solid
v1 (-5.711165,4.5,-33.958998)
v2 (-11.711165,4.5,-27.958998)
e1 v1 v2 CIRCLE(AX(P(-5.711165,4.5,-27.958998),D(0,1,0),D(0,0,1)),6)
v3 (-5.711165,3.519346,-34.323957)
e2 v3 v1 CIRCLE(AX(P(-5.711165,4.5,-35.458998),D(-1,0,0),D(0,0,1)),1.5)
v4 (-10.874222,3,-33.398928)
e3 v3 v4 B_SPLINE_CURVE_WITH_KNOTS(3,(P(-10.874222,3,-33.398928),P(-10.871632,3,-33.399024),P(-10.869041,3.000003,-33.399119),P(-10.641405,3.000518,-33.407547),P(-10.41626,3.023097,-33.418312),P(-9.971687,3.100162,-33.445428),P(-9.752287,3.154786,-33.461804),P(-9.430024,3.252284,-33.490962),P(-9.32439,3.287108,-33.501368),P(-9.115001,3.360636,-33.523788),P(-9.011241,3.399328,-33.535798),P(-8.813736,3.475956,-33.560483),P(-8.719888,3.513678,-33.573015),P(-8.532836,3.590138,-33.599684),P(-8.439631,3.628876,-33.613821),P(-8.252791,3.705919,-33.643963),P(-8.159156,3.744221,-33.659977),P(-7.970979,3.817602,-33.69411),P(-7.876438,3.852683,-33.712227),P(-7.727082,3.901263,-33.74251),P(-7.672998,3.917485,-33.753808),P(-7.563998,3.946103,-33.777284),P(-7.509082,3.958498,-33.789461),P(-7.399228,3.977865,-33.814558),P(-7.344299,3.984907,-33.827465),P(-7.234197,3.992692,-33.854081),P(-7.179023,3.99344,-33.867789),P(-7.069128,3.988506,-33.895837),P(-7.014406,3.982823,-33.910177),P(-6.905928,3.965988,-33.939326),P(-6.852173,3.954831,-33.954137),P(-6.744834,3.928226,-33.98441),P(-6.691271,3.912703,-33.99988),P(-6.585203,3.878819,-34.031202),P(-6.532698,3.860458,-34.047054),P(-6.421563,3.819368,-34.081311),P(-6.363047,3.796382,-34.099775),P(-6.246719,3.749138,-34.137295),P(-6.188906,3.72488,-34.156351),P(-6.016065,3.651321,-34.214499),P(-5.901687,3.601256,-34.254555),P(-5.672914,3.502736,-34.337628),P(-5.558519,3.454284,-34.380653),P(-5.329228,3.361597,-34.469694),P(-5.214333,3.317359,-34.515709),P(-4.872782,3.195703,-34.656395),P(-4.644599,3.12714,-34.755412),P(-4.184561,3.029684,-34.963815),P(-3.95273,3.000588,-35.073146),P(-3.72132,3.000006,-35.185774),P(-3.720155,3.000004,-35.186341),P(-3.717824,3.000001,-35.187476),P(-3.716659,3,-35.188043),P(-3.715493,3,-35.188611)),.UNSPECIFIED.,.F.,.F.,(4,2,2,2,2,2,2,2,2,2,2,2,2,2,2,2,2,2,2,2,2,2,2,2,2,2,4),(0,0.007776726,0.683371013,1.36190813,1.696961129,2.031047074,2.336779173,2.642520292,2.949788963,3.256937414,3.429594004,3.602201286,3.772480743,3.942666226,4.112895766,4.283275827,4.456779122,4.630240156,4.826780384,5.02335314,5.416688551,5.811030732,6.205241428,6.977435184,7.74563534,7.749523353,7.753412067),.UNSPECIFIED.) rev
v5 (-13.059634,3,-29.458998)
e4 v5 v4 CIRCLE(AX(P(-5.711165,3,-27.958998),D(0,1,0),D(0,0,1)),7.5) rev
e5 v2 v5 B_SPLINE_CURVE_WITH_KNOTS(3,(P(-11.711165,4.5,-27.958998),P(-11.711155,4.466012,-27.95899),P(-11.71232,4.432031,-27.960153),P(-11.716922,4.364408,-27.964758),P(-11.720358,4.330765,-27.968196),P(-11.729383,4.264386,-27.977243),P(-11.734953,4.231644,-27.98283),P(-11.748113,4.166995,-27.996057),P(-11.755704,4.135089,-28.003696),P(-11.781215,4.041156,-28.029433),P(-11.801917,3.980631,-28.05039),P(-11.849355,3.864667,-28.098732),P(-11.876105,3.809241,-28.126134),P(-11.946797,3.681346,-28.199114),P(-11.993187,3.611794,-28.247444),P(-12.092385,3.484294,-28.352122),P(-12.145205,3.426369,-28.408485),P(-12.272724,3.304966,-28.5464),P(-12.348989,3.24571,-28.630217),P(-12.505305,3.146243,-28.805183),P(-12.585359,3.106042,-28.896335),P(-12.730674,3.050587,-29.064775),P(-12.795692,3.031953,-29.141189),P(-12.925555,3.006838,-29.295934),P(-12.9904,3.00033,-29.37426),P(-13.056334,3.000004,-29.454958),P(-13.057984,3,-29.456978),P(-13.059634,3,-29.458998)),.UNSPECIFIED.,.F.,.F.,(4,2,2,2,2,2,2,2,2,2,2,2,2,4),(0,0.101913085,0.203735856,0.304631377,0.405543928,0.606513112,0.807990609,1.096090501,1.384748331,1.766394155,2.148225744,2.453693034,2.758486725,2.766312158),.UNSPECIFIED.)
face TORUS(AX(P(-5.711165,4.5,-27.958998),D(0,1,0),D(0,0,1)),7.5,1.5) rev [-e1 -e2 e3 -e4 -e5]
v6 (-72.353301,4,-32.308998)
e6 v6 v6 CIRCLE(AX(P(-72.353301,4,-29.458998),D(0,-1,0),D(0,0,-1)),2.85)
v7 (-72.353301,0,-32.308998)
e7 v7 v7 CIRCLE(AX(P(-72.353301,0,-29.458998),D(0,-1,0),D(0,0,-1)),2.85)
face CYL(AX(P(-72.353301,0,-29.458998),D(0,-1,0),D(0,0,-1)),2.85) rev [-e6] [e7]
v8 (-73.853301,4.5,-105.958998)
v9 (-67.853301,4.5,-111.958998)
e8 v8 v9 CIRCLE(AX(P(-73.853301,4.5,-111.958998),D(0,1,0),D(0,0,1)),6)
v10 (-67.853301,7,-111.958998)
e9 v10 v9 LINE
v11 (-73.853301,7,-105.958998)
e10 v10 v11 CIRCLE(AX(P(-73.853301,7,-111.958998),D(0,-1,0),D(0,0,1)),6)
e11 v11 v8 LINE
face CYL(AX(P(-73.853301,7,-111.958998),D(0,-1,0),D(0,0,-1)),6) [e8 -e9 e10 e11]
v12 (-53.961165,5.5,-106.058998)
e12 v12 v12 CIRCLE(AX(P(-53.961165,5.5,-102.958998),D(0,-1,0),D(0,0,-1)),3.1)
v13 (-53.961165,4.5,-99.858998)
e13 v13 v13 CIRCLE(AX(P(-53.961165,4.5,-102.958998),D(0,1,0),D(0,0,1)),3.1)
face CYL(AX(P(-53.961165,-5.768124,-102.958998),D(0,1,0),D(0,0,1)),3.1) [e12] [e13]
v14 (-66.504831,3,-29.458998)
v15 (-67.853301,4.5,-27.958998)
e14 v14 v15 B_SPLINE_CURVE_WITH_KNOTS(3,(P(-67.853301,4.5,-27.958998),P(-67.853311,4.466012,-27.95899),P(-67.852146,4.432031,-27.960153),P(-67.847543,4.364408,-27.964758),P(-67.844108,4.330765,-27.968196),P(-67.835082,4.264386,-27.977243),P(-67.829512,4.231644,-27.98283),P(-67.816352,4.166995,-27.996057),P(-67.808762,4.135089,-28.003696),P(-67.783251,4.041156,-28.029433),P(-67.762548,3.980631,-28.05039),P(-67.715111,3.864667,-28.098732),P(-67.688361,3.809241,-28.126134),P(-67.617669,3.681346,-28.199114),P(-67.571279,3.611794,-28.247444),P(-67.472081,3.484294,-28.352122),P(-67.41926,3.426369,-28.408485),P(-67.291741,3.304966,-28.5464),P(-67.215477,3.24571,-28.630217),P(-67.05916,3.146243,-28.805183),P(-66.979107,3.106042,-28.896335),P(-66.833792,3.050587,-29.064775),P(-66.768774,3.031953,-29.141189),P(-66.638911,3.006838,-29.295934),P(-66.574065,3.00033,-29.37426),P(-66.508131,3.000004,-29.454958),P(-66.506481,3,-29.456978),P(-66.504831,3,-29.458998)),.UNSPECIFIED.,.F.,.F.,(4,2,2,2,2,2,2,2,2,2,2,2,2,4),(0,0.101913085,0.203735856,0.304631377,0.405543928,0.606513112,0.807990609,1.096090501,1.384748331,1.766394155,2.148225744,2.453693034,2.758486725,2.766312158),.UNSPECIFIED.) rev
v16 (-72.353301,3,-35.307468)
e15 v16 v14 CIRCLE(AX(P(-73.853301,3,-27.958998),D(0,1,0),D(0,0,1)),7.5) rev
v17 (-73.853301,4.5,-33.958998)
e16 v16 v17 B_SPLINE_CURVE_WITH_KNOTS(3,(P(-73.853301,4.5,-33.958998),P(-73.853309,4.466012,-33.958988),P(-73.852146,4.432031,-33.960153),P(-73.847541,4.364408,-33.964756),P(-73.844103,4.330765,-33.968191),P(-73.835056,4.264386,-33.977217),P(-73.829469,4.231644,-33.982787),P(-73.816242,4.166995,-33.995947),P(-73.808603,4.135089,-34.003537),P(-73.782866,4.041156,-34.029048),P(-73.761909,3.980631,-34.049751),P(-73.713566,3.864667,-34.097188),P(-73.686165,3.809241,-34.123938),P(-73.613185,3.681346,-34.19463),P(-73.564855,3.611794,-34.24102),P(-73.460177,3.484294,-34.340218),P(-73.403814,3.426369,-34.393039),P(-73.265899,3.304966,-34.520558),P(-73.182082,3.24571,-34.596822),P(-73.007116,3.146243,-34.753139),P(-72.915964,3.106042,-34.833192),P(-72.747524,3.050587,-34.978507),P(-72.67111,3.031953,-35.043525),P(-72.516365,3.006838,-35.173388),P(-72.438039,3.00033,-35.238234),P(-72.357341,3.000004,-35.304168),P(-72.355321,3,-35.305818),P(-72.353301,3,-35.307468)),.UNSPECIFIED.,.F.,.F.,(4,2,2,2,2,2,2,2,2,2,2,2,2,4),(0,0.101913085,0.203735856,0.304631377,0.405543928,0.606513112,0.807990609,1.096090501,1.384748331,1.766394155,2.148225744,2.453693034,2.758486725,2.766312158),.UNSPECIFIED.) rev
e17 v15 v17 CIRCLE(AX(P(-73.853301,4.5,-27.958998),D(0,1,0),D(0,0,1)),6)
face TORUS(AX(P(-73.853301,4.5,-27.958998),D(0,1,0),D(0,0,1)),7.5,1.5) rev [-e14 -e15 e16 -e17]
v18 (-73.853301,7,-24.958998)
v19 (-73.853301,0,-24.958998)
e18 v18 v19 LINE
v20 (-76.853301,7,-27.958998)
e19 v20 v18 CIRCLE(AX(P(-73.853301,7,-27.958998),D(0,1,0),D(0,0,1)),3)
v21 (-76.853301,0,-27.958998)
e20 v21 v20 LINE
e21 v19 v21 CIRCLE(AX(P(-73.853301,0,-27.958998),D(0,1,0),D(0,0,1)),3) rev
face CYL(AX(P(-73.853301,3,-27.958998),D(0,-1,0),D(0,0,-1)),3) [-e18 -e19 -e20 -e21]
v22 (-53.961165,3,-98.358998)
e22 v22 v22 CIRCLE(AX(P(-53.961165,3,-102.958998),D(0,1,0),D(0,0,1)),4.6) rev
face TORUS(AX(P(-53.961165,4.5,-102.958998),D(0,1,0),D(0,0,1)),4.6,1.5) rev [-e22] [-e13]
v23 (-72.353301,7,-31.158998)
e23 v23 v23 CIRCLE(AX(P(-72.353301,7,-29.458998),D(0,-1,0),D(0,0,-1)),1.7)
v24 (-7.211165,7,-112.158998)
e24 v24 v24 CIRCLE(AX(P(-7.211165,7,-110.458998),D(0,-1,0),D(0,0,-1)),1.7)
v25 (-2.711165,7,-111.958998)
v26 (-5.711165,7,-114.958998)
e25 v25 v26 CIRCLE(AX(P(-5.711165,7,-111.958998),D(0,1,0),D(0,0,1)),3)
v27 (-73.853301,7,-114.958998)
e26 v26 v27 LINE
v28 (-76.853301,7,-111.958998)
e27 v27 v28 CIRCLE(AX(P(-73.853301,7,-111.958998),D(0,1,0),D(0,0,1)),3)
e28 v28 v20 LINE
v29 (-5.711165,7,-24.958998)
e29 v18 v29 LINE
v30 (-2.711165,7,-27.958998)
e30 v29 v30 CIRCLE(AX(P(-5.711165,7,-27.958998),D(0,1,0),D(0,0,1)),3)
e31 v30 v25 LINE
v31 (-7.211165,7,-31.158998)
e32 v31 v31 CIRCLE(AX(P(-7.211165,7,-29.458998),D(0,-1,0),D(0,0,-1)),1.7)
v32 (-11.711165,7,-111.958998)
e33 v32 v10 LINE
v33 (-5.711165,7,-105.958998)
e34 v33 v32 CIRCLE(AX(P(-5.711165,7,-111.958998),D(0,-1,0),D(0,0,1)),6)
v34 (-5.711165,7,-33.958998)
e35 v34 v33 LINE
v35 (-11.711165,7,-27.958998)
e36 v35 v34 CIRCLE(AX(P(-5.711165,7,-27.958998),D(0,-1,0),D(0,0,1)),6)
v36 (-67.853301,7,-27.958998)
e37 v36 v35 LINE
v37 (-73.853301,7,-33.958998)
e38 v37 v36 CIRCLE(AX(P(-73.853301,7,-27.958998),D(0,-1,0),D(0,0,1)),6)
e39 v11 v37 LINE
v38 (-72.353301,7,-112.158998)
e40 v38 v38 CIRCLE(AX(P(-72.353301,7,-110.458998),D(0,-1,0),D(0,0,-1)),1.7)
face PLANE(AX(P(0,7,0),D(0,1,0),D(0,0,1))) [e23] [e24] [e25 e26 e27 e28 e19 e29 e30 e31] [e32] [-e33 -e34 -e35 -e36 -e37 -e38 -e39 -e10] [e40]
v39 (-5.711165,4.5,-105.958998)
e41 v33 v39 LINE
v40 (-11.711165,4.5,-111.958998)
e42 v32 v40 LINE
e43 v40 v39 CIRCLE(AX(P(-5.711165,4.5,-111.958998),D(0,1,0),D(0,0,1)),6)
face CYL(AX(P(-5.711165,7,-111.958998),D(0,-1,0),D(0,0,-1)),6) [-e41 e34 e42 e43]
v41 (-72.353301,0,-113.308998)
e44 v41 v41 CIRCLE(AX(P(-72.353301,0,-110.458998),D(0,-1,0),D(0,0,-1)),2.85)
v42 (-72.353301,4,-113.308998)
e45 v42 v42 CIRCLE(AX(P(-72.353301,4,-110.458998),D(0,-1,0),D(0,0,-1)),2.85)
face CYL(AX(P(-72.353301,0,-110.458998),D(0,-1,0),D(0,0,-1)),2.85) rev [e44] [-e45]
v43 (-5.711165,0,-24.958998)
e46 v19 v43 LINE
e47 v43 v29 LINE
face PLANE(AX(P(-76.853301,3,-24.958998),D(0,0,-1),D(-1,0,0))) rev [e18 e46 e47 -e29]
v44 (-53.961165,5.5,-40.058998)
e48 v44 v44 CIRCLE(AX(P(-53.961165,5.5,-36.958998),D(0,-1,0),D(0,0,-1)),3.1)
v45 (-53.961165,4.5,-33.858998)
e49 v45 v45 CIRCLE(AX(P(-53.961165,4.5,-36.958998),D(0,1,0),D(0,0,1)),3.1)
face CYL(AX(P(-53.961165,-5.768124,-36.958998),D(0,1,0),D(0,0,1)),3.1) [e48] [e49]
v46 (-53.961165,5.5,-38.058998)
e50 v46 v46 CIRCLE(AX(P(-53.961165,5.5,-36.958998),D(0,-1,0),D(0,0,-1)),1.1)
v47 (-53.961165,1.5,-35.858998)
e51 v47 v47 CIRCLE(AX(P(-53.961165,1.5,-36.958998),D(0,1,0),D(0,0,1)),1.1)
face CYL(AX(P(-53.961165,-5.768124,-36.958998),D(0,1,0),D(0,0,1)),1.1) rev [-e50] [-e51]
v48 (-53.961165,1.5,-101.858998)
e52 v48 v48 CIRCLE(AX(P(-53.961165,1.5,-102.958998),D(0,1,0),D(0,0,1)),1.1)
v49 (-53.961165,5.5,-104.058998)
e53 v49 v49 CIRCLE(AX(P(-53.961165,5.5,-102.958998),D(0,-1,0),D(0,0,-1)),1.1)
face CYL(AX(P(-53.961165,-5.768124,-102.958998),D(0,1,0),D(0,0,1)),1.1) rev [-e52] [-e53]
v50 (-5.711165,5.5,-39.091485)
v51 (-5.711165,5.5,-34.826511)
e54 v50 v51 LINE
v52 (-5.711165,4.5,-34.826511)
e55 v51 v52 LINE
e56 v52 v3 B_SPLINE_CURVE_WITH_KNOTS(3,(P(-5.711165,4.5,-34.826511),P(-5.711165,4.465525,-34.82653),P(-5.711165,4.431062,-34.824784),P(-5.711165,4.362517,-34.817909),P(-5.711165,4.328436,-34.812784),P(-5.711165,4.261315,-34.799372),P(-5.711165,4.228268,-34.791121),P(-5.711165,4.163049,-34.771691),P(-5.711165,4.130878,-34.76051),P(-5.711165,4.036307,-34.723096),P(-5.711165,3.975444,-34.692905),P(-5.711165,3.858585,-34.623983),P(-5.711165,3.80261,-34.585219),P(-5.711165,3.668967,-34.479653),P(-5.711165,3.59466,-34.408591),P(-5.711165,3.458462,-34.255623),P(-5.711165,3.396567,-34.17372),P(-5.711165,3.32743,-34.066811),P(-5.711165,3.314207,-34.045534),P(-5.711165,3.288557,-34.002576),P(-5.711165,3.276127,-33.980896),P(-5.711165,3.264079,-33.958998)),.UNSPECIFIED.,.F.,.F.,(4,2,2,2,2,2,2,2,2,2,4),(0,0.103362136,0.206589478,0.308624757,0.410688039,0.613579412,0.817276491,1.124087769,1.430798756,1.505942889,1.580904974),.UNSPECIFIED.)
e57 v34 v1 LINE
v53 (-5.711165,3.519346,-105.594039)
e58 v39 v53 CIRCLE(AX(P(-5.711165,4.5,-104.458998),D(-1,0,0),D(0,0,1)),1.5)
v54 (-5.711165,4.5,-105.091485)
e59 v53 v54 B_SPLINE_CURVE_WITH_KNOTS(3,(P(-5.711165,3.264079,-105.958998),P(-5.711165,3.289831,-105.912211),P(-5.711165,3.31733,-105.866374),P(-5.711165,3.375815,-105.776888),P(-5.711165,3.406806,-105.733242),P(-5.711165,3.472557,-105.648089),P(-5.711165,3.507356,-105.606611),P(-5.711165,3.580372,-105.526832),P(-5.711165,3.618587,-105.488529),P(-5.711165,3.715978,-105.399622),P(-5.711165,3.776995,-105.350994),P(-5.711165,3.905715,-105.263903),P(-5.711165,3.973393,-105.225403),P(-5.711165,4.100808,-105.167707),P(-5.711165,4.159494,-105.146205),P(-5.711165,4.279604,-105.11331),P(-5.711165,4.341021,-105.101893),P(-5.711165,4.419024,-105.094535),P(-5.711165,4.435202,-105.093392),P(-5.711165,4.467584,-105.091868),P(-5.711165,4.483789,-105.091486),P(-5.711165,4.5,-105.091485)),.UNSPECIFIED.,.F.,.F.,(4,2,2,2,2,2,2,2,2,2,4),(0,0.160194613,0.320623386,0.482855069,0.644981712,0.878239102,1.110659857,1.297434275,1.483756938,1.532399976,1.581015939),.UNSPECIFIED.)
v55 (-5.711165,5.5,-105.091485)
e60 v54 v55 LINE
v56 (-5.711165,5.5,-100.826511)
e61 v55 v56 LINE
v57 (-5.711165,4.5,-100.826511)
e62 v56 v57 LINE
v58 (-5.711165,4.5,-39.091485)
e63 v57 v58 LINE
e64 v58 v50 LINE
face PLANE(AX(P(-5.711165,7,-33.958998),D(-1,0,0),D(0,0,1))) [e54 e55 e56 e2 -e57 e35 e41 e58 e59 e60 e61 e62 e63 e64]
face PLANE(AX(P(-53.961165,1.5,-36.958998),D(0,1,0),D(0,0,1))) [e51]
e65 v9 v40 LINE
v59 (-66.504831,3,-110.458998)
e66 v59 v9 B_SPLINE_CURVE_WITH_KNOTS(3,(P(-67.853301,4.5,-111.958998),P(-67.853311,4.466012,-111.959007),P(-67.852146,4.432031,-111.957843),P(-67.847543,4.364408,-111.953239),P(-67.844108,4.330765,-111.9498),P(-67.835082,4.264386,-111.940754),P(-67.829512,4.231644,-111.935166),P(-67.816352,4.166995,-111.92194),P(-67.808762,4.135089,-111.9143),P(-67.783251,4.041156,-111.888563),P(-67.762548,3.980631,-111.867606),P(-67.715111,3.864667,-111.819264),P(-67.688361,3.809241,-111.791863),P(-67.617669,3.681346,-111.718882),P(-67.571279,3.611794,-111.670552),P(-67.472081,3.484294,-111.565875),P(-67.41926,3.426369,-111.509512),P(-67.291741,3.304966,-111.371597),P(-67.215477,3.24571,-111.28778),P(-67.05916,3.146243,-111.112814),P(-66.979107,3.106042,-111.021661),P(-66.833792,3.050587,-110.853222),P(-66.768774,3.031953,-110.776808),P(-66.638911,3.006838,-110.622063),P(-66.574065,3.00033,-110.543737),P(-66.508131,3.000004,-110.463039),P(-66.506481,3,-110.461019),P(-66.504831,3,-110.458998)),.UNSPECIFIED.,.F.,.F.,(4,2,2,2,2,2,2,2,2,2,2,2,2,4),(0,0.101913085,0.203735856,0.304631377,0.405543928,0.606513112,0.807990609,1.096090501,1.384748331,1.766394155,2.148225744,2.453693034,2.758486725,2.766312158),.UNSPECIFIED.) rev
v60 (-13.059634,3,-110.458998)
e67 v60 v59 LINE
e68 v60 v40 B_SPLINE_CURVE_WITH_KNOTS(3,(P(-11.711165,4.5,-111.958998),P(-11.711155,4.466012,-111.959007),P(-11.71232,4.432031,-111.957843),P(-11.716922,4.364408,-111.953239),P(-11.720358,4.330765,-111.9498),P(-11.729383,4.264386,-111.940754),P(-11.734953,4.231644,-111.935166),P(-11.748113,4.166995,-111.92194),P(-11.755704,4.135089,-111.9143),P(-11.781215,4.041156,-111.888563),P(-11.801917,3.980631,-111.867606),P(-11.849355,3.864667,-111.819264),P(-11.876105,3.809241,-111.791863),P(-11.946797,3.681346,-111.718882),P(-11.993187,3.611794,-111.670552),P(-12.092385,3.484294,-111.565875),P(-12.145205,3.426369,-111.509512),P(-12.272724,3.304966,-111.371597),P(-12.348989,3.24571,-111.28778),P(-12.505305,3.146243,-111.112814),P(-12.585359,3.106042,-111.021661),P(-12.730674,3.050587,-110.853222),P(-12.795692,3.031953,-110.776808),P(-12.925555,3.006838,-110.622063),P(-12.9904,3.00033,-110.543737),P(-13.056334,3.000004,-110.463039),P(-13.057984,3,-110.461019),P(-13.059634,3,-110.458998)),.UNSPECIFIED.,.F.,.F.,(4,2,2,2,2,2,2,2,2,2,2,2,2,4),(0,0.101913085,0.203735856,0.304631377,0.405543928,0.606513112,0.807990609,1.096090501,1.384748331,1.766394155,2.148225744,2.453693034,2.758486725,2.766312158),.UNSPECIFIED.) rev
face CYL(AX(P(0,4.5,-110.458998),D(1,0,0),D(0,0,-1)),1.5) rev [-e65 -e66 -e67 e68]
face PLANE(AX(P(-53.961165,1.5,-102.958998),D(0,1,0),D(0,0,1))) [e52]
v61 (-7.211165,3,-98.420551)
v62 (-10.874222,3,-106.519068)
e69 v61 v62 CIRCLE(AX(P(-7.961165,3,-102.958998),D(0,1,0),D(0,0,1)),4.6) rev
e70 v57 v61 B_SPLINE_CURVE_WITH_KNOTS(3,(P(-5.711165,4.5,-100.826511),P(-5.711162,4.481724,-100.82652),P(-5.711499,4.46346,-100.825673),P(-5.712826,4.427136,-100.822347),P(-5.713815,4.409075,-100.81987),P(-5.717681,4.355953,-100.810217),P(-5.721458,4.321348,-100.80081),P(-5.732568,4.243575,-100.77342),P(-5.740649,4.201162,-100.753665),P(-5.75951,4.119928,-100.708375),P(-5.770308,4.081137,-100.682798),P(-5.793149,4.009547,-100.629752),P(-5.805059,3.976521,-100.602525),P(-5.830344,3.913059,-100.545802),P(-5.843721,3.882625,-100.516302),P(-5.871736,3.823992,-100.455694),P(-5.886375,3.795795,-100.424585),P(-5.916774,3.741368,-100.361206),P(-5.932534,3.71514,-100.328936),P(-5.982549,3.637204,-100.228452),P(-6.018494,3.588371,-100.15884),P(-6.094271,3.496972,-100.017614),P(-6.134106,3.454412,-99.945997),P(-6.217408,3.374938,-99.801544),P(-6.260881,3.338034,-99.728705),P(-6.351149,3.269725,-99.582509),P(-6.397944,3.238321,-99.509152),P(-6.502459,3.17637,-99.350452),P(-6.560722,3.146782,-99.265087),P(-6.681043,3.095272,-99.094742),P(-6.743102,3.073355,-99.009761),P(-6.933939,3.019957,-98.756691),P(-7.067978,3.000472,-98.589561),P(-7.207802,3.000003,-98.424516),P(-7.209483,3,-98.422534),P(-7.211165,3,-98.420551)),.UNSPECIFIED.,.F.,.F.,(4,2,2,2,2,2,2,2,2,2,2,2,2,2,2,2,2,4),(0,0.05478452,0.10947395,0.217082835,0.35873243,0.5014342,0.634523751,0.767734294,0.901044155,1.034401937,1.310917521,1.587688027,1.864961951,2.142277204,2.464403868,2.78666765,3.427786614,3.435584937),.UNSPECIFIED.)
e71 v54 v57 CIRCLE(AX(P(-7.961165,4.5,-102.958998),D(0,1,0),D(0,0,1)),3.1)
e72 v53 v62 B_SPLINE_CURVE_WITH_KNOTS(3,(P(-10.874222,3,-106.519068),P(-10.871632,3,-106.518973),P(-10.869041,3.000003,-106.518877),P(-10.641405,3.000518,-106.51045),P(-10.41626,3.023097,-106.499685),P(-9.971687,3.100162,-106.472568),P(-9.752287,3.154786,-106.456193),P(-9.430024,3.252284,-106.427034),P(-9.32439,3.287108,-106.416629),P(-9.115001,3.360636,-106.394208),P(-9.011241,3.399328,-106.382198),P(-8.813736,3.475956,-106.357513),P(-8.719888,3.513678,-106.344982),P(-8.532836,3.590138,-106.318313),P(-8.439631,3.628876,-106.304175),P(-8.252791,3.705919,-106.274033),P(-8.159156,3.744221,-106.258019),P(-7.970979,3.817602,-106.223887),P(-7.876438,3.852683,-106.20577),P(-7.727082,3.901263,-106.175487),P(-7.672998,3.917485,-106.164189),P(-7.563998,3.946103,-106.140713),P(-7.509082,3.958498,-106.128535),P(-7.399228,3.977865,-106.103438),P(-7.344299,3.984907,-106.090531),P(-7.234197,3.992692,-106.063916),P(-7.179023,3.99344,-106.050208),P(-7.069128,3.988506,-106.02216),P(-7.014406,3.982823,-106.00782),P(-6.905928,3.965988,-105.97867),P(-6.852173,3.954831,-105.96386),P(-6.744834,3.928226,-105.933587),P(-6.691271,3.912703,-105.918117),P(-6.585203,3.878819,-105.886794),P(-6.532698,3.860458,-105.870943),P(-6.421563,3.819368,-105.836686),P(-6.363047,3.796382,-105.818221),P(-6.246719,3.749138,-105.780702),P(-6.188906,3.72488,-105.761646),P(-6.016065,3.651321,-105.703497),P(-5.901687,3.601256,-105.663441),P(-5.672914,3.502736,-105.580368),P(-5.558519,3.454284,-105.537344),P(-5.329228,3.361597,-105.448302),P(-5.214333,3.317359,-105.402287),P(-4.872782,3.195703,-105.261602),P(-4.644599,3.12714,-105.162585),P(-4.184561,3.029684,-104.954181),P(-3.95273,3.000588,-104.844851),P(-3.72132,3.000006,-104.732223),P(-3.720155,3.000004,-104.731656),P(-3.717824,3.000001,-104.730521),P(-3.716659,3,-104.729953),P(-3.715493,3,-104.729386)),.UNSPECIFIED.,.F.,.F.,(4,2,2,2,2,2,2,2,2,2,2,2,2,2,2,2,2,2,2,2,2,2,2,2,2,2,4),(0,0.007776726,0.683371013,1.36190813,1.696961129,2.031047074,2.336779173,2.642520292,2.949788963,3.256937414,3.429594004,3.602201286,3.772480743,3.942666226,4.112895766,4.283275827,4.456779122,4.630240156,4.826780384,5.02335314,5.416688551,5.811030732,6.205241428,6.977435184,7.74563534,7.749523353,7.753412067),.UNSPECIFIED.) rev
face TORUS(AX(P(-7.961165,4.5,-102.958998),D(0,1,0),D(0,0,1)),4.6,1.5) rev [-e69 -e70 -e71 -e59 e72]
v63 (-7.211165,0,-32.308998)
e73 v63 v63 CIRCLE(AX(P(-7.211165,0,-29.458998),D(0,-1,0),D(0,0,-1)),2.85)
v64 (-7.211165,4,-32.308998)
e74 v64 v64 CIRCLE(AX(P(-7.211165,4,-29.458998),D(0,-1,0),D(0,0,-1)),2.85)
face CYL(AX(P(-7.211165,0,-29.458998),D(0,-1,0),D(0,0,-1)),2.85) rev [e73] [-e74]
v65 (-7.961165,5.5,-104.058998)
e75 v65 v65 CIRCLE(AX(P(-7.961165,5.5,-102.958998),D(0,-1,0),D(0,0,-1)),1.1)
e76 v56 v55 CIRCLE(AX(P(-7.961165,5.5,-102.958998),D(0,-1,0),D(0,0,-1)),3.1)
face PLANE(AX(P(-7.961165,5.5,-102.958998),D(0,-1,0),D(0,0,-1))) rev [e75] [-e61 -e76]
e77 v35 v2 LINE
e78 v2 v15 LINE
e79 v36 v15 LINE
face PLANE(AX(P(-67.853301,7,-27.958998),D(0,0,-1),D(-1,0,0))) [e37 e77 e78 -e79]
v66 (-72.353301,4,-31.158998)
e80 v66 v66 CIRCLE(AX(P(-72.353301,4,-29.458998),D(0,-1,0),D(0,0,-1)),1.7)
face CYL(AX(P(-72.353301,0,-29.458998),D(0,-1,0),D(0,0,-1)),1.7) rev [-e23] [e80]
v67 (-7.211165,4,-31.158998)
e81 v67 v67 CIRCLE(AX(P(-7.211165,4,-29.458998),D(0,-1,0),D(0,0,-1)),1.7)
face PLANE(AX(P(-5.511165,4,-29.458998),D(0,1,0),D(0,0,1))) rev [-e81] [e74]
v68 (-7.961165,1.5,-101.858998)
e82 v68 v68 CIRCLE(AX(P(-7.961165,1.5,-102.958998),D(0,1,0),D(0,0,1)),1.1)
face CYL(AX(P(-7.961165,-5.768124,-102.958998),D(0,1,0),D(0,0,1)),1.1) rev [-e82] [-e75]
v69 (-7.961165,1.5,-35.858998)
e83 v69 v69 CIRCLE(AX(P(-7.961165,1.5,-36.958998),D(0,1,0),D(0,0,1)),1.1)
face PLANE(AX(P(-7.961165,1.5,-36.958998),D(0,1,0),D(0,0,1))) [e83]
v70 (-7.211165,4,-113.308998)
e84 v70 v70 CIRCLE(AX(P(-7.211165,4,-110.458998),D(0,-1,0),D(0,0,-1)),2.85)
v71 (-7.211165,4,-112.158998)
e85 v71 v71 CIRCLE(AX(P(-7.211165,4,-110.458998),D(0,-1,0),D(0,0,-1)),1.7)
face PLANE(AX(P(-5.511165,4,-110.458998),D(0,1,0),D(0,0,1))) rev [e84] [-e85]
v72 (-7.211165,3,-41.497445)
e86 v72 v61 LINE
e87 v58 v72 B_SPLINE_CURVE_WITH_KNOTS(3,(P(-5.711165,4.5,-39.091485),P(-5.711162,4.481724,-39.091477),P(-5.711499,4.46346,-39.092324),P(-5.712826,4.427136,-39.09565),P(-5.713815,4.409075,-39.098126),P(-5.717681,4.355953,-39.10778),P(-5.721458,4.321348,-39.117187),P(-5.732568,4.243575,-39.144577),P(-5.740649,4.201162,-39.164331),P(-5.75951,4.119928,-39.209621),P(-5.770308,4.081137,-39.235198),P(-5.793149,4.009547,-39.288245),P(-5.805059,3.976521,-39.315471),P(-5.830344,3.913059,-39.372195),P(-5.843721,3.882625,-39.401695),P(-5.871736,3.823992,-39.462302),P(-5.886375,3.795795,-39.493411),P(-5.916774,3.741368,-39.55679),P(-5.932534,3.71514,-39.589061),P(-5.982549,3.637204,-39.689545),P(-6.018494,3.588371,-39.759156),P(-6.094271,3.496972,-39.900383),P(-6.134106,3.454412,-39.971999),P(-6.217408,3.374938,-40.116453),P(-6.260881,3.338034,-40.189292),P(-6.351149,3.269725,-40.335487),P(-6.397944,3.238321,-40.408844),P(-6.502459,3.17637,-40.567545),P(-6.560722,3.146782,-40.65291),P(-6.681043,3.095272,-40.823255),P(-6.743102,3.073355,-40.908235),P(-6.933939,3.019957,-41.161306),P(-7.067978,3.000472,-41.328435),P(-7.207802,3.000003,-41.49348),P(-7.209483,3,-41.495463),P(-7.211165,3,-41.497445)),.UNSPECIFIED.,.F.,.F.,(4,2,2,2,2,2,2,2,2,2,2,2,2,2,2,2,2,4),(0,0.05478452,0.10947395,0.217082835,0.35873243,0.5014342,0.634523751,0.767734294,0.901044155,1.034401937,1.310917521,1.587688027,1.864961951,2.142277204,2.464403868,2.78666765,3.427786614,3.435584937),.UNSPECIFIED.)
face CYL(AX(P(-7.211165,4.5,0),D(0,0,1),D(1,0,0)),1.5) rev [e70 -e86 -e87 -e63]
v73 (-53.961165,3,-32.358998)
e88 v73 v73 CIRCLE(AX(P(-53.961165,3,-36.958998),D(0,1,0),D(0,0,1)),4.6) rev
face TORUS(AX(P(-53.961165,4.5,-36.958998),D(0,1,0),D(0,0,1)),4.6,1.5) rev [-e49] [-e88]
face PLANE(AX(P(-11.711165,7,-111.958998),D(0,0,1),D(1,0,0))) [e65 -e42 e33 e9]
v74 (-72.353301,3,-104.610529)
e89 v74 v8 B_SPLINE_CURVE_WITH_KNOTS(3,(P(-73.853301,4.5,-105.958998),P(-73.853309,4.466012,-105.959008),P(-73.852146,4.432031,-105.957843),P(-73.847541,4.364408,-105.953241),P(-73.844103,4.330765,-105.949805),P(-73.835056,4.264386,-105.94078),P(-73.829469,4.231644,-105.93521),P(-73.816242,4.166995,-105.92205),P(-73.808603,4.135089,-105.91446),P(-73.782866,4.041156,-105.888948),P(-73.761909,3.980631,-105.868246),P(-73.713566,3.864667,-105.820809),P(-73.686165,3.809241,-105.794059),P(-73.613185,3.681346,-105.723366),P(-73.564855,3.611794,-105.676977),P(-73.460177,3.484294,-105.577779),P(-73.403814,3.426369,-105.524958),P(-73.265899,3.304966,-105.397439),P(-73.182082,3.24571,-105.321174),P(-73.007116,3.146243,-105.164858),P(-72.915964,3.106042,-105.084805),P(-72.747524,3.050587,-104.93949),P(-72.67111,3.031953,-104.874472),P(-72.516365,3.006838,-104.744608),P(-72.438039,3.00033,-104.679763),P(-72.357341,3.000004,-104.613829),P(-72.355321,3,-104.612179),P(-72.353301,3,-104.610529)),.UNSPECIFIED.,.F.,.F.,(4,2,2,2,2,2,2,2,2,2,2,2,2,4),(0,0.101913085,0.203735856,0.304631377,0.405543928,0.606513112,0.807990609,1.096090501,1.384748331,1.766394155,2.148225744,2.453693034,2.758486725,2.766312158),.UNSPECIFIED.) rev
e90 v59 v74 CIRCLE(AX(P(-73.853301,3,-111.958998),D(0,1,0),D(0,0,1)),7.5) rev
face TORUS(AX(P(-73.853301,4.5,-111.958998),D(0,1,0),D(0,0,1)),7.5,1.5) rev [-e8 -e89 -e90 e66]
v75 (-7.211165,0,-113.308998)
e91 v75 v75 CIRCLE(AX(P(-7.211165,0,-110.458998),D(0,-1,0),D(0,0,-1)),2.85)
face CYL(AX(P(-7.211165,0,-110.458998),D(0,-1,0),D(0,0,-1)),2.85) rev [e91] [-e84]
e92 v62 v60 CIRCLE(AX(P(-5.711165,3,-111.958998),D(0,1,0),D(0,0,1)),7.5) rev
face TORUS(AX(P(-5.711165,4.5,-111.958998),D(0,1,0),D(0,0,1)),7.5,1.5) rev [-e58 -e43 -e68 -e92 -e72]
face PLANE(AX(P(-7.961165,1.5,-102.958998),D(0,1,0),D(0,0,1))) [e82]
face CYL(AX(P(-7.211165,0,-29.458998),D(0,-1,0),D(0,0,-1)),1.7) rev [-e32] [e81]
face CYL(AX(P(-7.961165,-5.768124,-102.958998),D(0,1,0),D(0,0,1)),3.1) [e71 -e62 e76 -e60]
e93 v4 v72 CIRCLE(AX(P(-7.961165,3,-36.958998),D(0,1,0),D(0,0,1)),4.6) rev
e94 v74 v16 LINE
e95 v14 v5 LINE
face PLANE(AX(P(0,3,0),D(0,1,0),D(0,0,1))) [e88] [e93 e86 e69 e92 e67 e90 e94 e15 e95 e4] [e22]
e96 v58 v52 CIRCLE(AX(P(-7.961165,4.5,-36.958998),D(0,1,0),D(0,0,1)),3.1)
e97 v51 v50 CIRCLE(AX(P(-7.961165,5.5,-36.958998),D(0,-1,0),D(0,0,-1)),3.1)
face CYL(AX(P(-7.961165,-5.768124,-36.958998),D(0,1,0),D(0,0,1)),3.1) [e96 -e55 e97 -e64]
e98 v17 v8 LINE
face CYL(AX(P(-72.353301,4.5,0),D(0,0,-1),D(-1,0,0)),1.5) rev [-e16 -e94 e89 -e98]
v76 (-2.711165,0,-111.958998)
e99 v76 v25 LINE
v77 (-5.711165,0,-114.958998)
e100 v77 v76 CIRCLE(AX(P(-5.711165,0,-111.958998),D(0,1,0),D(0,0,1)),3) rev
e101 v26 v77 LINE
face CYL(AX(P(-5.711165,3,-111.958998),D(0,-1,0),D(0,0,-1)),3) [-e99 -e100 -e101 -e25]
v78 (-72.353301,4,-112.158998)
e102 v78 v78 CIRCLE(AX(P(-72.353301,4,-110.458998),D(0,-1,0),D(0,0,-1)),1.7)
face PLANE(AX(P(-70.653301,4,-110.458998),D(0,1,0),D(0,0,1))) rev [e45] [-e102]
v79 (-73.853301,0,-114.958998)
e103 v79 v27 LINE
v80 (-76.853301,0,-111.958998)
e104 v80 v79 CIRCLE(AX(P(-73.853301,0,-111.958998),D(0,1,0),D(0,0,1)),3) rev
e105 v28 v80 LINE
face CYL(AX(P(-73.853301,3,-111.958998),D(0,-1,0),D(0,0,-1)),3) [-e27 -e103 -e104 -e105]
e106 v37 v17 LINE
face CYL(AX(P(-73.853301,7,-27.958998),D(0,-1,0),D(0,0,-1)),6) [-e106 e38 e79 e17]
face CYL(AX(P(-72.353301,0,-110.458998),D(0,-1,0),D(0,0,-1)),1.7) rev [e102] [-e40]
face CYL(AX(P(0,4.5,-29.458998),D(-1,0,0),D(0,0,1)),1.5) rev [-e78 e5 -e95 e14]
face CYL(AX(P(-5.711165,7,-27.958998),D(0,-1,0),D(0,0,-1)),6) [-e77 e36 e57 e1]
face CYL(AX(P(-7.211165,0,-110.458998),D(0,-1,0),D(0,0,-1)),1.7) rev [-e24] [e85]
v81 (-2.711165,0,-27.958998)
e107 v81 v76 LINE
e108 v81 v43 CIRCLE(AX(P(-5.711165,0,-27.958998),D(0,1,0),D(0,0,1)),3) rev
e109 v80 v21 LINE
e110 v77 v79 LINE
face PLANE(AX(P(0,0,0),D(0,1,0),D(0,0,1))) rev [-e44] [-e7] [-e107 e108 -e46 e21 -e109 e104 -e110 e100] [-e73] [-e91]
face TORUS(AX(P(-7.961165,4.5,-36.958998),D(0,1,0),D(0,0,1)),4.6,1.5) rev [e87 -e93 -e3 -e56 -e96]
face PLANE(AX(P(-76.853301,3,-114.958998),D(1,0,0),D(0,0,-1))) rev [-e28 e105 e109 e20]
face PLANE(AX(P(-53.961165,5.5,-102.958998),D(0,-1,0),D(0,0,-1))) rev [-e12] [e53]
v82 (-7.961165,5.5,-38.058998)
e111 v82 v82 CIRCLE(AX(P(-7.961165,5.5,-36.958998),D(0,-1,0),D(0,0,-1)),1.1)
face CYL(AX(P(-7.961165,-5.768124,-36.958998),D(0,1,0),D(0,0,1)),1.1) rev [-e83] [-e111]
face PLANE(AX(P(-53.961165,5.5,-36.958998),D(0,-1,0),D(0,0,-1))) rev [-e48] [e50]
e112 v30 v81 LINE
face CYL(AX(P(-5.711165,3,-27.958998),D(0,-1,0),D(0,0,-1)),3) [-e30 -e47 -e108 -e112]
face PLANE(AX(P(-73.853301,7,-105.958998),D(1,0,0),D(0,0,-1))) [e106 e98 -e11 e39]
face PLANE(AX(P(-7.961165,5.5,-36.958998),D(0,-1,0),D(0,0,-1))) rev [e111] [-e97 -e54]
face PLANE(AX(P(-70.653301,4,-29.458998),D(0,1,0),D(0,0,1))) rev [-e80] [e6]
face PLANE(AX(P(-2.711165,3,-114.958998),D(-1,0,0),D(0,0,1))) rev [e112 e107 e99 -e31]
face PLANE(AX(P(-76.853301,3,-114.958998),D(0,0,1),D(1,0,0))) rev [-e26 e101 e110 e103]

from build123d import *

# Parameters (mm, degrees)
SKETCH1_W                      = 74.142135624
SKETCH1_H                      = 90
BOSS_EXTRUDE1_DEPTH            = 3
SKETCH2_W                      = 74.142135624
SKETCH2_H                      = 90
BOSS_EXTRUDE2_DEPTH            = 4
CBORE_FOR_M3_SHCS1_D           = 3.4
CBORE_FOR_M3_SHCS1_CBORE_D     = 5.7
CBORE_FOR_M3_SHCS1_CBORE_DEPTH = 4
BOSS_EXTRUDE8_START            = 1.5
SKETCH5_R                      = 3.1
SKETCH5_R_2                    = 1.1
BOSS_EXTRUDE8_DEPTH            = 2.5
SKETCH6_R                      = 1.1
CUT_EXTRUDE1_DEPTH             = 1.5
FILLET1_R                      = 1.5
FILLET2_R                      = 3


with BuildPart() as part:
    # Sketch1 → Boss-Extrude1 (new body)
    with BuildSketch(Plane(origin=(0, 0, 0), x_dir=(1, 0, 0), z_dir=(0, 1, 0))):
        with Locations((-39.782232781, 69.958998281)):
            Rectangle(SKETCH1_W, SKETCH1_H)
    extrude(amount=BOSS_EXTRUDE1_DEPTH)

    # Sketch2 → Boss-Extrude2 (add)
    with BuildSketch(Plane(origin=(0, 3, 0), x_dir=(1, 0, 0), z_dir=(0, 1, 0))):
        with Locations((-39.782232781, 69.958998281)):
            Rectangle(SKETCH2_W, SKETCH2_H)
        with BuildLine():
            Line((-5.711164969, 33.958998281), (-5.711164969, 105.958998281))
            ThreePointArc((-5.711164969, 105.958998281), (-9.953805657, 107.716357594), (-11.711164969, 111.958998281))
            Line((-11.711164969, 111.958998281), (-67.853300593, 111.958998281))
            ThreePointArc((-67.853300593, 111.958998281), (-69.610659906, 107.716357594), (-73.853300593, 105.958998281))
            Line((-73.853300593, 105.958998281), (-73.853300593, 33.958998281))
            ThreePointArc((-73.853300593, 33.958998281), (-69.610659906, 32.201638968), (-67.853300593, 27.958998281))
            Line((-67.853300593, 27.958998281), (-11.711164969, 27.958998281))
            ThreePointArc((-11.711164969, 27.958998281), (-9.953805657, 32.201638968), (-5.711164969, 33.958998281))
        make_face(mode=Mode.SUBTRACT)
    extrude(amount=BOSS_EXTRUDE2_DEPTH)

    # CBORE for M3 SHCS1 (through all)
    with Locations(Plane(origin=(0, 0, 0), x_dir=(-1, 0, 0), z_dir=(0, -1, 0))):
        with Locations((72.353300593, 29.458998281), (7.211164969, 29.458998281), (7.211164969, 110.458998281), (72.353300593, 110.458998281)):
            CounterBoreHole(CBORE_FOR_M3_SHCS1_D / 2, CBORE_FOR_M3_SHCS1_CBORE_D / 2, CBORE_FOR_M3_SHCS1_CBORE_DEPTH)

    # Sketch5 → Boss-Extrude8 (add)
    # profile 1 of 4: a face of its own
    with BuildSketch(Plane(origin=(-76.853300593, 7, -114.958998281), x_dir=(1, 0, 0), z_dir=(0, -1, 0)).offset(BOSS_EXTRUDE8_START)):
        with Locations(Location((22.892135624, 12, 0), (0, 0, 90))):
            Circle(SKETCH5_R)
        with Locations(Location((22.892135624, 12, 0), (0, 0, 90))):
            Circle(SKETCH5_R_2, mode=Mode.SUBTRACT)
    # profile 2 of 4: a face of its own
    with BuildSketch(Plane(origin=(-76.853300593, 7, -114.958998281), x_dir=(1, 0, 0), z_dir=(0, -1, 0)).offset(BOSS_EXTRUDE8_START)):
        with Locations((68.892135624, 12)):
            Circle(SKETCH5_R)
        with Locations(Location((68.892135624, 12, 0), (0, 0, 90))):
            Circle(SKETCH5_R_2, mode=Mode.SUBTRACT)
    # profile 3 of 4: a face of its own
    with BuildSketch(Plane(origin=(-76.853300593, 7, -114.958998281), x_dir=(1, 0, 0), z_dir=(0, -1, 0)).offset(BOSS_EXTRUDE8_START)):
        with Locations((68.892135624, 78)):
            Circle(SKETCH5_R)
        with Locations(Location((68.892135624, 78, 0), (0, 0, 90))):
            Circle(SKETCH5_R_2, mode=Mode.SUBTRACT)
    # profile 4 of 4: a face of its own
    with BuildSketch(Plane(origin=(-76.853300593, 7, -114.958998281), x_dir=(1, 0, 0), z_dir=(0, -1, 0)).offset(BOSS_EXTRUDE8_START)):
        with Locations(Location((22.892135624, 78, 0), (0, 0, 90))):
            Circle(SKETCH5_R)
        with Locations(Location((22.892135624, 78, 0), (0, 0, 90))):
            Circle(SKETCH5_R_2, mode=Mode.SUBTRACT)
    extrude(amount=BOSS_EXTRUDE8_DEPTH)

    # Sketch6 → Cut-Extrude1 (cut)
    with BuildSketch(Plane(origin=(0, 3, 0), x_dir=(1, 0, 0), z_dir=(0, 1, 0))):
        with Locations(Location((-7.961164969, 36.958998281, 0), (0, 0, 270))):
            Circle(SKETCH6_R)
        with Locations(Location((-53.961164969, 36.958998281, 0), (0, 0, 270))):
            Circle(SKETCH6_R)
        with Locations(Location((-53.961164969, 102.958998281, 0), (0, 0, 270))):
            Circle(SKETCH6_R)
        with Locations(Location((-7.961164969, 102.958998281, 0), (0, 0, 270))):
            Circle(SKETCH6_R)
    extrude(amount=-CUT_EXTRUDE1_DEPTH, mode=Mode.SUBTRACT)

    # Fillet1
    # the kernel refuses this fillet: 1.5 mm, written as the material it adds along each edge
    with BuildSketch(Plane(origin=(-73.853300593, 3, -27.958998281), x_dir=(-0.5853008610590891, 0, -0.8108161949810135), z_dir=(-0.8108161949810135, 0, 0.5853008610590891))) as fillet1_piece_1_section:
        with BuildLine():
            CenterArc((6 + FILLET1_R, -FILLET1_R), FILLET1_R, 90, 90)
            Line((6, -FILLET1_R), (6, 0))
            Line((6, 0), (6 + FILLET1_R, 0))
        make_face()
    fillet1_piece_1 = revolve(axis=Axis((-73.853300593, 3, -27.958998281), (0, -1, 0)), revolution_arc=125.824247309, mode=Mode.PRIVATE)
    fillet1_piece_1 = split(fillet1_piece_1, bisect_by=Plane(origin=(-76.853300593, 3.427407816, -32.503861933), z_dir=(1, 0, 0)), keep=Keep.TOP, mode=Mode.PRIVATE)
    add(fillet1_piece_1)
    with BuildSketch(Plane(origin=(-53.961164969, 3, -36.958998281), x_dir=(0, 0, 1), z_dir=(1, 0, 0))) as fillet1_piece_2:
        with BuildLine():
            CenterArc((3.1 + FILLET1_R, -FILLET1_R), FILLET1_R, 90, 90)
            Line((3.1, -FILLET1_R), (3.1, 0))
            Line((3.1, 0), (3.1 + FILLET1_R, 0))
        make_face()
    revolve(axis=Axis((-53.961164969, 3, -36.958998281), (0, -1, 0)))
    with BuildSketch(Plane(origin=(-5.711164969, 3, -27.958998281), x_dir=(-1, 0, 0), z_dir=(0, 0, 1))) as fillet1_piece_3:
        with BuildLine():
            CenterArc((6 + FILLET1_R, -FILLET1_R), FILLET1_R, 90, 90)
            Line((6, -FILLET1_R), (6, 0))
            Line((6, 0), (6 + FILLET1_R, 0))
        make_face()
    revolve(axis=Axis((-5.711164969, 3, -27.958998281), (0, -1, 0)), revolution_arc=90)
    with BuildSketch(Plane(origin=(-7.961164969, 3, -36.958998281), x_dir=(0.9999950652018581, 0, 0.0031415874858777702), z_dir=(0.0031415874858777702, 0, -0.9999950652018581))) as fillet1_piece_4:
        with BuildLine():
            CenterArc((3.1 + FILLET1_R, -FILLET1_R), FILLET1_R, 90, 90)
            Line((3.1, -FILLET1_R), (3.1, 0))
            Line((3.1, 0), (3.1 + FILLET1_R, 0))
        make_face()
    revolve(axis=Axis((-7.961164969, 3, -36.958998281), (0, -1, 0)), revolution_arc=359.64)
    with BuildSketch(Plane(origin=(-5.711164969, 3, -35.341485092), x_dir=(-1, 0, 0), z_dir=(0, 0, -1))) as fillet1_piece_5_section:
        with BuildLine():
            CenterArc((FILLET1_R, FILLET1_R), FILLET1_R, 180, 90)
            Line((0, FILLET1_R), (0, 0))
            Line((0, 0), (FILLET1_R, 0))
        make_face()
    fillet1_piece_5 = extrude(amount=69.235026378, mode=Mode.PRIVATE)
    fillet1_piece_5 = fillet1_piece_5 - Plane(origin=(-7.961164969, 3.336189736, -102.958998281), x_dir=(0, 0, 1), z_dir=(0, 1, 0)) * Cylinder(1.1, 145, mode=Mode.PRIVATE)
    fillet1_piece_5 = fillet1_piece_5 - Plane(origin=(-7.961164969, 3.336189736, -36.958998281), x_dir=(0, 0, 1), z_dir=(0, 1, 0)) * Cylinder(1.1, 145, mode=Mode.PRIVATE)
    add(fillet1_piece_5)
    with BuildSketch(Plane(origin=(-7.961164969, 3, -102.958998281), x_dir=(0.9999950652018581, 0, 0.0031415874858777702), z_dir=(0.0031415874858777702, 0, -0.9999950652018581))) as fillet1_piece_6:
        with BuildLine():
            CenterArc((3.1 + FILLET1_R, -FILLET1_R), FILLET1_R, 90, 90)
            Line((3.1, -FILLET1_R), (3.1, 0))
            Line((3.1, 0), (3.1 + FILLET1_R, 0))
        make_face()
    revolve(axis=Axis((-7.961164969, 3, -102.958998281), (0, -1, 0)), revolution_arc=359.64)
    with BuildSketch(Plane(origin=(-5.711164969, 3, -111.958998281), x_dir=(0, 0, 1), z_dir=(1, 0, 0))) as fillet1_piece_7:
        with BuildLine():
            CenterArc((6 + FILLET1_R, -FILLET1_R), FILLET1_R, 90, 90)
            Line((6, -FILLET1_R), (6, 0))
            Line((6, 0), (6 + FILLET1_R, 0))
        make_face()
    revolve(axis=Axis((-5.711164969, 3, -111.958998281), (0, -1, 0)), revolution_arc=90)
    with BuildSketch(Plane(origin=(-73.853300593, 3, -109.708998281), x_dir=(1, 0, 0), z_dir=(0, 0, 1))) as fillet1_piece_8_section:
        with BuildLine():
            CenterArc((FILLET1_R, FILLET1_R), FILLET1_R, 180, 90)
            Line((0, FILLET1_R), (0, 0))
            Line((0, 0), (FILLET1_R, 0))
        make_face()
    fillet1_piece_8 = extrude(amount=79.5, mode=Mode.PRIVATE)
    fillet1_piece_8 = fillet1_piece_8 - Plane(origin=(-73.853300593, 3.311177076, -111.958998281), x_dir=(1, 0, 0), z_dir=(0, -1, 0)) * Cylinder(6, 165, mode=Mode.PRIVATE)
    fillet1_piece_8 = fillet1_piece_8 - Plane(origin=(-73.853300593, 3.311177076, -27.958998281), x_dir=(0, 0, -1), z_dir=(0, -1, 0)) * Cylinder(6, 165, mode=Mode.PRIVATE)
    add(fillet1_piece_8)
    with BuildSketch(Plane(origin=(-73.853300593, 3, -111.958998281), x_dir=(1, 0, 0), z_dir=(0, 0, -1))) as fillet1_piece_9_section:
        with BuildLine():
            CenterArc((6 + FILLET1_R, -FILLET1_R), FILLET1_R, 90, 90)
            Line((6, -FILLET1_R), (6, 0))
            Line((6, 0), (6 + FILLET1_R, 0))
        make_face()
    fillet1_piece_9 = revolve(axis=Axis((-73.853300593, 3, -111.958998281), (0, -1, 0)), revolution_arc=125.824247309, mode=Mode.PRIVATE)
    fillet1_piece_9 = split(fillet1_piece_9, bisect_by=Plane(origin=(-76.853300593, 3.427407819, -107.414134627), z_dir=(1, 0, 0)), keep=Keep.TOP, mode=Mode.PRIVATE)
    add(fillet1_piece_9)
    with BuildSketch(Plane(origin=(-7.961164969, 3, -111.958998281), x_dir=(0, 1, 0), z_dir=(-1, 0, 0))) as fillet1_piece_10_section:
        with BuildLine():
            CenterArc((FILLET1_R, -FILLET1_R), FILLET1_R, 90, 90)
            Line((0, -FILLET1_R), (0, 0))
            Line((0, 0), (FILLET1_R, 0))
        make_face()
    fillet1_piece_10 = extrude(amount=63.642135624, mode=Mode.PRIVATE)
    fillet1_piece_10 = fillet1_piece_10 - Plane(origin=(-5.711164969, 4.124273766, -111.958998281), x_dir=(0, 0, 1), z_dir=(0, -1, 0)) * Cylinder(6, 134, mode=Mode.PRIVATE)
    fillet1_piece_10 = fillet1_piece_10 - Plane(origin=(-73.853300593, 4.124273766, -111.958998281), x_dir=(1, 0, 0), z_dir=(0, -1, 0)) * Cylinder(6, 134, mode=Mode.PRIVATE)
    add(fillet1_piece_10)
    with BuildSketch(Plane(origin=(-53.961164969, 3, -102.958998281), x_dir=(0, 0, 1), z_dir=(1, 0, 0))) as fillet1_piece_11:
        with BuildLine():
            CenterArc((3.1 + FILLET1_R, -FILLET1_R), FILLET1_R, 90, 90)
            Line((3.1, -FILLET1_R), (3.1, 0))
            Line((3.1, 0), (3.1 + FILLET1_R, 0))
        make_face()
    revolve(axis=Axis((-53.961164969, 3, -102.958998281), (0, -1, 0)))
    with BuildSketch(Plane(origin=(-71.603300593, 3, -27.958998281), x_dir=(0, 0, -1), z_dir=(1, 0, 0))) as fillet1_piece_12_section:
        with BuildLine():
            CenterArc((FILLET1_R, FILLET1_R), FILLET1_R, 180, 90)
            Line((0, FILLET1_R), (0, 0))
            Line((0, 0), (FILLET1_R, 0))
        make_face()
    fillet1_piece_12 = extrude(amount=63.642135624, mode=Mode.PRIVATE)
    fillet1_piece_12 = fillet1_piece_12 - Plane(origin=(-5.711164969, 3.311153627, -27.958998281), x_dir=(-1, 0, 0), z_dir=(0, -1, 0)) * Cylinder(6, 134, mode=Mode.PRIVATE)
    fillet1_piece_12 = fillet1_piece_12 - Plane(origin=(-73.853300593, 3.311153627, -27.958998281), x_dir=(0, 0, -1), z_dir=(0, -1, 0)) * Cylinder(6, 134, mode=Mode.PRIVATE)
    add(fillet1_piece_12)

    # Fillet2
    fillet2_edges = [part.edges().sort_by_distance(p)[0] for p in [
        (-2.711164969, 3.5, -24.958998281),
        (-76.853300593, 3.5, -24.958998281),
        (-76.853300593, 3.5, -114.958998281),
        (-2.711164969, 3.5, -114.958998281),
    ]]
    fillet(fillet2_edges, radius=FILLET2_R)


solid = part.part
